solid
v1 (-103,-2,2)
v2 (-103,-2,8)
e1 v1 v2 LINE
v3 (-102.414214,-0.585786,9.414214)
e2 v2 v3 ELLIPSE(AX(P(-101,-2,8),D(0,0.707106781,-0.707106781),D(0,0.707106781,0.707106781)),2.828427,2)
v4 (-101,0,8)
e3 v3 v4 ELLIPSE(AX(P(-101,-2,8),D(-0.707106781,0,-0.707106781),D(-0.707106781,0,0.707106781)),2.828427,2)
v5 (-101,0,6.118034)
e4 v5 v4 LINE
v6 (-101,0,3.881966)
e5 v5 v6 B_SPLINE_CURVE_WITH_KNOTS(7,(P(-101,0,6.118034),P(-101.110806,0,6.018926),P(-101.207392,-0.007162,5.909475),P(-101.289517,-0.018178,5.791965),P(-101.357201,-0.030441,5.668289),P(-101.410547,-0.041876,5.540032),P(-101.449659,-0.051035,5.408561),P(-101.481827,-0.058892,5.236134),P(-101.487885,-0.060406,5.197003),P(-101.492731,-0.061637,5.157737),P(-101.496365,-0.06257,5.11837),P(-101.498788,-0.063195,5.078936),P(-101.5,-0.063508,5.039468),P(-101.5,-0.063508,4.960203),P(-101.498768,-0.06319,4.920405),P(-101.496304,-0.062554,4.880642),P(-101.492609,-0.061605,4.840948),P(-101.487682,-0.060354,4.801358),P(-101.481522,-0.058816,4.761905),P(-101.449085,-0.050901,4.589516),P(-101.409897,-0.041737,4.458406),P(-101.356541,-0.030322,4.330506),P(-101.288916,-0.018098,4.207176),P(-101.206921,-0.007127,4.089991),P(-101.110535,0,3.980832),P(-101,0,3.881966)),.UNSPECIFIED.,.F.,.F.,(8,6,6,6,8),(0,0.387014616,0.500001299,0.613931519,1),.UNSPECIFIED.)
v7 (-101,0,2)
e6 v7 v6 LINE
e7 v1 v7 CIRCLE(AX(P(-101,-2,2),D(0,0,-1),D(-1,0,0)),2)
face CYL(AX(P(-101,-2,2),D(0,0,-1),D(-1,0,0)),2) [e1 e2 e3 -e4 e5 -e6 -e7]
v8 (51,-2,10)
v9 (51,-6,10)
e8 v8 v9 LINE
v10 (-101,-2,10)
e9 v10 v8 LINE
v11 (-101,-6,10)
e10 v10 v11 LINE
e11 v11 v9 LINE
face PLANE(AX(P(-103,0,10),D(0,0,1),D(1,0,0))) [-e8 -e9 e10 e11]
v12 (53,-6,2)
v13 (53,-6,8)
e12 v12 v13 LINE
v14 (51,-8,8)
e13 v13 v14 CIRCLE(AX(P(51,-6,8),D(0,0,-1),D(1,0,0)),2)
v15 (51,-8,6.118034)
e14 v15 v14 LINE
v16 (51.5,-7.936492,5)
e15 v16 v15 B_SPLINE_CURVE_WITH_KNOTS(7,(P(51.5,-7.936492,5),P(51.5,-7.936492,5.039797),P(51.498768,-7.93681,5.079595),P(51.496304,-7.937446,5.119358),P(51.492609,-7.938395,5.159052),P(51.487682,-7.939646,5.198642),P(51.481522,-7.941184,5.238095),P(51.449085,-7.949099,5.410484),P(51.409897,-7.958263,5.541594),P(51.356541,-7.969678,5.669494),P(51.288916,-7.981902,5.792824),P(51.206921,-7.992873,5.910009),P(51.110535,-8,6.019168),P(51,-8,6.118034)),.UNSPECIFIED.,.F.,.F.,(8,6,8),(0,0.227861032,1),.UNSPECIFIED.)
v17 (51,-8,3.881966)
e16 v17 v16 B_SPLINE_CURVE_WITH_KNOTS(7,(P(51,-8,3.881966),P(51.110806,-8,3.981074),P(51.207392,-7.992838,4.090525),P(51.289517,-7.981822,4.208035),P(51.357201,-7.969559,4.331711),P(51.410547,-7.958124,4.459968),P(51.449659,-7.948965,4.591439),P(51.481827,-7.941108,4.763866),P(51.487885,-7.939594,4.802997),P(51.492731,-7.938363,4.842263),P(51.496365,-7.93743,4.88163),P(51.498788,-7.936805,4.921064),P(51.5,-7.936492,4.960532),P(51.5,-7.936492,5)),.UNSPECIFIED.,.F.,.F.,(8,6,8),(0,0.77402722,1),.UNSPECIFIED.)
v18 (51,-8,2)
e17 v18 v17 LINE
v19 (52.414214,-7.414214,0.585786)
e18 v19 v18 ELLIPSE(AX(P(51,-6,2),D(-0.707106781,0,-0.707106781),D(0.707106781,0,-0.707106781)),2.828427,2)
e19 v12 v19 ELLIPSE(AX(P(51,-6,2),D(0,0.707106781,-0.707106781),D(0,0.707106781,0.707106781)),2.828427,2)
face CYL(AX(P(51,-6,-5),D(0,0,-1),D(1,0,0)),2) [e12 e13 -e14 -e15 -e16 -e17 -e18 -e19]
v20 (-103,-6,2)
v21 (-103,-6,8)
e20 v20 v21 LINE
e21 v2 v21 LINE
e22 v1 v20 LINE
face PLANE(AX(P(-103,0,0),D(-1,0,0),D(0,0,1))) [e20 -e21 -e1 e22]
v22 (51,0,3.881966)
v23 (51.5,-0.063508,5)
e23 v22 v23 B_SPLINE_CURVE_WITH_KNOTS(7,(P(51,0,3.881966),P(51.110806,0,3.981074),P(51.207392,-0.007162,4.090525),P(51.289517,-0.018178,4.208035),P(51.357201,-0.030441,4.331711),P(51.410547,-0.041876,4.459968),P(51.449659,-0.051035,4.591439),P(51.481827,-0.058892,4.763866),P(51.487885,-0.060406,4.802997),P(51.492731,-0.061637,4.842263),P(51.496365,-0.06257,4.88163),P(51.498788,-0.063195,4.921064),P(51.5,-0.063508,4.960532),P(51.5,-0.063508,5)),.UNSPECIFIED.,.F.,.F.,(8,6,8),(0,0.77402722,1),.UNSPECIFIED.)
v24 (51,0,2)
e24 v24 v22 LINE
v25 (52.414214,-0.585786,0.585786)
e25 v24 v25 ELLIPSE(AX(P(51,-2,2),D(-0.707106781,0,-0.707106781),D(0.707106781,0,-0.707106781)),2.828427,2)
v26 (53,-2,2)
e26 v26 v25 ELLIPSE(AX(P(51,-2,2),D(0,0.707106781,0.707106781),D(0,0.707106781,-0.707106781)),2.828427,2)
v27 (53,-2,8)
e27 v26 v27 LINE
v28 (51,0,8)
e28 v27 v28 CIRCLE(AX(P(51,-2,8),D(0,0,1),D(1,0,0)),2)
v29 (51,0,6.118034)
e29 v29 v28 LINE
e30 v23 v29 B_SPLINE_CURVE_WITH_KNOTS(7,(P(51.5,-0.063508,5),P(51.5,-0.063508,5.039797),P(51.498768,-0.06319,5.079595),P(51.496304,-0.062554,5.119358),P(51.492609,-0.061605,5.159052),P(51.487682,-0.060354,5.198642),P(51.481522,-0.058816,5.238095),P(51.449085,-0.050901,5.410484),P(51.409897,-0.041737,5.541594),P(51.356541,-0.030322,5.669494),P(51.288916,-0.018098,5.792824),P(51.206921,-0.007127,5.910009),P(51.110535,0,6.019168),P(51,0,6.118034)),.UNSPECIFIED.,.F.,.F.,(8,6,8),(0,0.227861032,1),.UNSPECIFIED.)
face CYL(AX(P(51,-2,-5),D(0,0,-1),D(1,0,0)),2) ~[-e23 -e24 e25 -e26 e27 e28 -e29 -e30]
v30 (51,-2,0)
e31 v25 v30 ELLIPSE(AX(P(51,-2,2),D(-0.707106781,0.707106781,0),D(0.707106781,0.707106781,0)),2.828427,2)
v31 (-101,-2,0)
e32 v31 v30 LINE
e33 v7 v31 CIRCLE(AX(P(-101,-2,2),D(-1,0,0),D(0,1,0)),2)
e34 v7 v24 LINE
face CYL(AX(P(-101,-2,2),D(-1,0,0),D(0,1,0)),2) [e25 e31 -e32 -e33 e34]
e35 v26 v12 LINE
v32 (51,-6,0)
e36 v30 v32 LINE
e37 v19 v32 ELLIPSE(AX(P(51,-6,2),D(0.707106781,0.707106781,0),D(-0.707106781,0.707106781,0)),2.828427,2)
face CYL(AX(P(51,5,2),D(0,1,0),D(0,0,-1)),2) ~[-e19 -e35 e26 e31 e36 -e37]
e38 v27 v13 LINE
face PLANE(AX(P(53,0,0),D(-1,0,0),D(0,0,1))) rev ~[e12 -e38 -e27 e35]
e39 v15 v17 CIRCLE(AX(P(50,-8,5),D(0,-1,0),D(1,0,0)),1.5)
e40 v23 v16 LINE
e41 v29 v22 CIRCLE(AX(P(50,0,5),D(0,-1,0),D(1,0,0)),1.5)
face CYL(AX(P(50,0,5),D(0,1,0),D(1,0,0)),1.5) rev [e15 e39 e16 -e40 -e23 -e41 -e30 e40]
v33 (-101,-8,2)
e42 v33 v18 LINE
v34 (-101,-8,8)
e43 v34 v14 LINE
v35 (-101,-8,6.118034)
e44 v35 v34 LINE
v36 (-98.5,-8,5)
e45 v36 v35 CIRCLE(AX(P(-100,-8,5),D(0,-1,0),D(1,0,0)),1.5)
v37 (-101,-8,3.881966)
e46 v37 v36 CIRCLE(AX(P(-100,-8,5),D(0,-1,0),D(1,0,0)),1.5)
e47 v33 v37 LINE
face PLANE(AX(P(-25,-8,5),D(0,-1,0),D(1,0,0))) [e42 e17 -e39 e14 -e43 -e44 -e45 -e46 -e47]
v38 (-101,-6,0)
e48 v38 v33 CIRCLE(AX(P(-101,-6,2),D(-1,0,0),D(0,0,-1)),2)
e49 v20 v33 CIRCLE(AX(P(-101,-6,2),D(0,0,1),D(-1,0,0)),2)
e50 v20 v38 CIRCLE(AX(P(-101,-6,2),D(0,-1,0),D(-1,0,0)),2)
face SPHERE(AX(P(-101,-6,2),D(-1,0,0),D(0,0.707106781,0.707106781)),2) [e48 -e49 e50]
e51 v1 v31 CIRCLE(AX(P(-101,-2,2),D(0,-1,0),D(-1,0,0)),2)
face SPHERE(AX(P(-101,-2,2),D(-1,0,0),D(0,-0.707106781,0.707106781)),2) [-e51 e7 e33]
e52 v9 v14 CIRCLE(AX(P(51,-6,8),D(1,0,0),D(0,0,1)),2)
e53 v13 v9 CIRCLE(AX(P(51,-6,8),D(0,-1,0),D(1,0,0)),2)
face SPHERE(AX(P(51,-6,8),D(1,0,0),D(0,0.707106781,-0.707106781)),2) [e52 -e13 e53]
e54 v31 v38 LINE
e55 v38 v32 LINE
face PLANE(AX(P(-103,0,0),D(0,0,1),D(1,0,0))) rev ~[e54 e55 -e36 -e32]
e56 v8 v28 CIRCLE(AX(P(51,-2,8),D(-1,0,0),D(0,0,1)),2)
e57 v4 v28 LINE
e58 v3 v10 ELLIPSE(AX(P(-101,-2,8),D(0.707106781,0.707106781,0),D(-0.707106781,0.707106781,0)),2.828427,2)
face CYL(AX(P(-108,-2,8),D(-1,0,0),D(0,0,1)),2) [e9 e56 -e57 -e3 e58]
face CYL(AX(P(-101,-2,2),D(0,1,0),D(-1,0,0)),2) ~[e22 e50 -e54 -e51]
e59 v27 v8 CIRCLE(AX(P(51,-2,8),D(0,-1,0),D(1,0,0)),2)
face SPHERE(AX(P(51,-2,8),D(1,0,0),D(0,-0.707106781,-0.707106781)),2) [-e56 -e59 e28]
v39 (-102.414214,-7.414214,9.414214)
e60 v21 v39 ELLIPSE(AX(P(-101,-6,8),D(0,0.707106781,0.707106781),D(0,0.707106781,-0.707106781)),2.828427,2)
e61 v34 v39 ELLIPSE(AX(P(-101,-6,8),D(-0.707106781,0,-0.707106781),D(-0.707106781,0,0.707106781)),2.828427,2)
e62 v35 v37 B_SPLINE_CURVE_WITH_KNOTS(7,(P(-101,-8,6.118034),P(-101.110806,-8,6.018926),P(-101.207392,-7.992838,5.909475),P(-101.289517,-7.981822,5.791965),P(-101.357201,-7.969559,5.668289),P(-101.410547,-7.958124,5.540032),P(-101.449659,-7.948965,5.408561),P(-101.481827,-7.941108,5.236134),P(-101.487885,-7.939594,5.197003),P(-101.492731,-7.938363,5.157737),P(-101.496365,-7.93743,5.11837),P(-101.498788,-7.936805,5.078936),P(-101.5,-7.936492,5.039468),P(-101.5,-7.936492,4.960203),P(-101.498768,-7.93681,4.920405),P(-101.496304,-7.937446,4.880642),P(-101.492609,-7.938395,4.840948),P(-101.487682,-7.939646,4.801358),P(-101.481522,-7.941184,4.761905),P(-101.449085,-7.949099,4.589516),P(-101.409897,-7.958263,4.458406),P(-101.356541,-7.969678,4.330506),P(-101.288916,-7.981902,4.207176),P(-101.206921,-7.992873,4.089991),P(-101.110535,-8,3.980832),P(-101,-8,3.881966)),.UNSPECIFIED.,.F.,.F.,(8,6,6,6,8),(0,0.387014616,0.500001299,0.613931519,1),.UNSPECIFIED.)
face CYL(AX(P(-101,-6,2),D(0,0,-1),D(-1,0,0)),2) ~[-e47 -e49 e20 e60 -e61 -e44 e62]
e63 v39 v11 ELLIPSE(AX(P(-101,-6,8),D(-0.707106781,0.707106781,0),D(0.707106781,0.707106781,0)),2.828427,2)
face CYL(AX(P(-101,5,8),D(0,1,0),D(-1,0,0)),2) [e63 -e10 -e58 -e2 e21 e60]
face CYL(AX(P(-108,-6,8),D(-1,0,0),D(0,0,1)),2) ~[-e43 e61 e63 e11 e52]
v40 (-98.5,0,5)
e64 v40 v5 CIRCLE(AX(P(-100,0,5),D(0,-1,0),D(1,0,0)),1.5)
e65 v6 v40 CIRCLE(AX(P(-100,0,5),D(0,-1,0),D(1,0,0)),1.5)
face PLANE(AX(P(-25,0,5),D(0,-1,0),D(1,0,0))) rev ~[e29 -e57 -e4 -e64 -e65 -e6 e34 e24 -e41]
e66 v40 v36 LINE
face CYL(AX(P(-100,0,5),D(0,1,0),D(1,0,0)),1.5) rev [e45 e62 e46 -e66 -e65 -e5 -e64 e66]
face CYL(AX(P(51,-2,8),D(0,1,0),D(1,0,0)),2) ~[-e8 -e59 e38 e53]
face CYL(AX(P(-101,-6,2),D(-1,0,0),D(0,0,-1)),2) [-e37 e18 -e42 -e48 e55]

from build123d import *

# Parameters (mm, degrees)
F0_W         = 156
F0_H         = 10
F0_R         = 1.5
F1_DEPTH     = 8
F2_T1_DEPTH  = 4
F2_T3_DEPTH  = 18
F2_T5_DEPTH  = 159
F2_T7_DEPTH  = 13
F2_S11_W     = 2
F2_S11_H     = 2
F2_T12_DEPTH = 2
F2_S17_W     = 2
F2_S17_H     = 2
F2_T18_DEPTH = 2
F3_T1_DEPTH  = 11
F3_T3_DEPTH  = 4
F3_T5_DEPTH  = 157
F3_S9_W      = 2.04
F3_S9_H      = 2.04
F3_T10_DEPTH = 2.04
F3_S15_W     = 2.04
F3_S15_H     = 2.04
F3_T16_DEPTH = 2.04


# Not quite as in the source:
# - a fillet or chamfer that OpenCascade refuses, or shapes differently, is made with other operations: its cross-section is extruded or revolved along the edge and cut away or added


with BuildPart() as f1:
    # F0 (on Front) → F1 (new body)
    with BuildSketch(Plane.XZ):
        with Locations((-25, 5)):
            Rectangle(F0_W, F0_H)
        with Locations((-100, 5)):
            Circle(F0_R, mode=Mode.SUBTRACT)
        with Locations((50, 5)):
            Circle(F0_R, mode=Mode.SUBTRACT)
    extrude(amount=F1_DEPTH)

    # F2: fillet of radius 2 on 7 edges, made by hand

    # F2_s2 → F2_t1 (cut)
    with BuildSketch(Plane.XZ.offset(2)):
        with BuildLine():
            ThreePointArc((53, 8), (52.4142135624, 9.4142135624), (51, 10))
            Line((51, 10), (53, 10))
            Line((53, 10), (53, 8))
        make_face()
    extrude(amount=F2_T1_DEPTH, mode=Mode.SUBTRACT)

    # F2_s4 → F2_t3 (cut)
    with BuildSketch(Plane.XZ.offset(-5)):
        with BuildLine():
            ThreePointArc((-103, 8), (-102.4142135624, 9.4142135624), (-101, 10))
            Line((-101, 10), (-103, 10))
            Line((-103, 10), (-103, 8))
        make_face()
        with BuildLine():
            ThreePointArc((51, 0), (52.4142135624, 0.5857864376), (53, 2))
            Line((53, 2), (53, 0))
            Line((53, 0), (51, 0))
        make_face()
    extrude(amount=F2_T3_DEPTH, mode=Mode.SUBTRACT)

    # F2_s6 → F2_t5 (cut)
    with BuildSketch(Plane.YZ.offset(-108)):
        with BuildLine():
            ThreePointArc((-2, 10), (-0.5857864376, 9.4142135624), (0, 8))
            Line((0, 8), (0, 10))
            Line((0, 10), (-2, 10))
        make_face()
        with BuildLine():
            ThreePointArc((-6, 10), (-7.4142135624, 9.4142135624), (-8, 8))
            Line((-8, 8), (-8, 10))
            Line((-8, 10), (-6, 10))
        make_face()
    extrude(amount=F2_T5_DEPTH, mode=Mode.SUBTRACT)

    # F2_s8 → F2_t7 (cut)
    with BuildSketch(Plane.XY.offset(-5)):
        with BuildLine():
            ThreePointArc((53, -2), (52.4142135624, -0.5857864376), (51, 0))
            Line((51, 0), (53, 0))
            Line((53, 0), (53, -2))
        make_face()
        with BuildLine():
            ThreePointArc((53, -6), (52.4142135624, -7.4142135624), (51, -8))
            Line((51, -8), (53, -8))
            Line((53, -8), (53, -6))
        make_face()
    extrude(amount=F2_T7_DEPTH, mode=Mode.SUBTRACT)


with BuildPart() as f2_tool10:
    # F2_s11 → F2_t12 (new body)
    with BuildSketch(Plane.YZ.offset(51)):
        with Locations((-1, 9)):
            Rectangle(F2_S11_W, F2_S11_H)
    extrude(amount=F2_T12_DEPTH)

    # F2_s13 → F2_t14 (revolve, cut)
    with BuildSketch(Plane(origin=(51, -2, 8), x_dir=(0, -0.7071067812, -0.7071067812), z_dir=(0, -0.7071067812, 0.7071067812))):
        with BuildLine():
            ThreePointArc((0, -2), (2, 0), (0, 2))
            Line((0, 2), (0, -2))
        make_face()
    revolve(axis=Axis((51, -2, 8), (1, 0, 0)), mode=Mode.SUBTRACT)


with BuildPart() as f1_1:
    add(f1.part)

    # F2_t9: cut F2_tool10
    add(f2_tool10.part, mode=Mode.SUBTRACT)


with BuildPart() as f2_tool16:
    # F2_s17 → F2_t18 (new body)
    with BuildSketch(Plane.YZ.offset(51)):
        with Locations((-7, 9)):
            Rectangle(F2_S17_W, F2_S17_H)
    extrude(amount=F2_T18_DEPTH)

    # F2_s19 → F2_t20 (revolve, cut)
    with BuildSketch(Plane(origin=(51, -6, 8), x_dir=(0, 0.7071067812, -0.7071067812), z_dir=(0, -0.7071067812, -0.7071067812))):
        with BuildLine():
            ThreePointArc((0, -2), (2, 0), (0, 2))
            Line((0, 2), (0, -2))
        make_face()
    revolve(axis=Axis((51, -6, 8), (1, 0, 0)), mode=Mode.SUBTRACT)


with BuildPart() as f1_2:
    add(f1_1.part)

    # F2_t15: cut F2_tool16
    add(f2_tool16.part, mode=Mode.SUBTRACT)

    # F3: fillet of radius 2 on 7 edges, made by hand

    # F3_s2 → F3_t1 (cut)
    with BuildSketch(Plane.XY.offset(2)):
        with BuildLine():
            ThreePointArc((-103, -2), (-102.4142135624, -0.5857864376), (-101, 0))
            Line((-101, 0), (-103, 0))
            Line((-103, 0), (-103, -2))
        make_face()
        with BuildLine():
            ThreePointArc((-103, -6), (-102.4142135624, -7.4142135624), (-101, -8))
            Line((-101, -8), (-103, -8))
            Line((-103, -8), (-103, -6))
        make_face()
    extrude(amount=F3_T1_DEPTH, mode=Mode.SUBTRACT)

    # F3_s4 → F3_t3 (cut)
    with BuildSketch(Plane.XZ.offset(2)):
        with BuildLine():
            ThreePointArc((-103, 2), (-102.4142135624, 0.5857864376), (-101, 0))
            Line((-101, 0), (-103, 0))
            Line((-103, 0), (-103, 2))
        make_face()
    extrude(amount=F3_T3_DEPTH, mode=Mode.SUBTRACT)

    # F3_s6 → F3_t5 (cut)
    with BuildSketch(Plane.YZ.offset(-101)):
        with BuildLine():
            ThreePointArc((0, 2), (-0.5857864376, 0.5857864376), (-2, 0))
            Line((-2, 0), (0, 0))
            Line((0, 0), (0, 2))
        make_face()
        with BuildLine():
            ThreePointArc((-6, 0), (-7.4142135624, 0.5857864376), (-8, 2))
            Line((-8, 2), (-8, 0))
            Line((-8, 0), (-6, 0))
        make_face()
    extrude(amount=F3_T5_DEPTH, mode=Mode.SUBTRACT)


with BuildPart() as f3_tool8:
    # F3_s9 → F3_t10 (new body)
    with BuildSketch(Plane.YZ.offset(-101)):
        with Locations((-0.98, 0.98)):
            Rectangle(F3_S9_W, F3_S9_H)
    extrude(amount=-F3_T10_DEPTH)

    # F3_s11 → F3_t12 (revolve, cut)
    with BuildSketch(Plane(origin=(-101, -2, 2), x_dir=(0, -0.7071067812, 0.7071067812), z_dir=(0, -0.7071067812, -0.7071067812))):
        with BuildLine():
            ThreePointArc((0, -2), (2, 0), (0, 2))
            Line((0, 2), (0, -2))
        make_face()
    revolve(axis=Axis((-101, -2, 2), (-1, 0, 0)), mode=Mode.SUBTRACT)


with BuildPart() as f1_3:
    add(f1_2.part)

    # F3_t7: cut F3_tool8
    add(f3_tool8.part, mode=Mode.SUBTRACT)


with BuildPart() as f3_tool14:
    # F3_s15 → F3_t16 (new body)
    with BuildSketch(Plane.YZ.offset(-101)):
        with Locations((-7.02, 0.98)):
            Rectangle(F3_S15_W, F3_S15_H)
    extrude(amount=-F3_T16_DEPTH)

    # F3_s17 → F3_t18 (revolve, cut)
    with BuildSketch(Plane(origin=(-101, -6, 2), x_dir=(0, 0.7071067812, 0.7071067812), z_dir=(0, -0.7071067812, 0.7071067812))):
        with BuildLine():
            ThreePointArc((0, -2), (2, 0), (0, 2))
            Line((0, 2), (0, -2))
        make_face()
    revolve(axis=Axis((-101, -6, 2), (-1, 0, 0)), mode=Mode.SUBTRACT)


with BuildPart() as f1_4:
    add(f1_3.part)

    # F3_t13: cut F3_tool14
    add(f3_tool14.part, mode=Mode.SUBTRACT)


solid = f1_4.part
